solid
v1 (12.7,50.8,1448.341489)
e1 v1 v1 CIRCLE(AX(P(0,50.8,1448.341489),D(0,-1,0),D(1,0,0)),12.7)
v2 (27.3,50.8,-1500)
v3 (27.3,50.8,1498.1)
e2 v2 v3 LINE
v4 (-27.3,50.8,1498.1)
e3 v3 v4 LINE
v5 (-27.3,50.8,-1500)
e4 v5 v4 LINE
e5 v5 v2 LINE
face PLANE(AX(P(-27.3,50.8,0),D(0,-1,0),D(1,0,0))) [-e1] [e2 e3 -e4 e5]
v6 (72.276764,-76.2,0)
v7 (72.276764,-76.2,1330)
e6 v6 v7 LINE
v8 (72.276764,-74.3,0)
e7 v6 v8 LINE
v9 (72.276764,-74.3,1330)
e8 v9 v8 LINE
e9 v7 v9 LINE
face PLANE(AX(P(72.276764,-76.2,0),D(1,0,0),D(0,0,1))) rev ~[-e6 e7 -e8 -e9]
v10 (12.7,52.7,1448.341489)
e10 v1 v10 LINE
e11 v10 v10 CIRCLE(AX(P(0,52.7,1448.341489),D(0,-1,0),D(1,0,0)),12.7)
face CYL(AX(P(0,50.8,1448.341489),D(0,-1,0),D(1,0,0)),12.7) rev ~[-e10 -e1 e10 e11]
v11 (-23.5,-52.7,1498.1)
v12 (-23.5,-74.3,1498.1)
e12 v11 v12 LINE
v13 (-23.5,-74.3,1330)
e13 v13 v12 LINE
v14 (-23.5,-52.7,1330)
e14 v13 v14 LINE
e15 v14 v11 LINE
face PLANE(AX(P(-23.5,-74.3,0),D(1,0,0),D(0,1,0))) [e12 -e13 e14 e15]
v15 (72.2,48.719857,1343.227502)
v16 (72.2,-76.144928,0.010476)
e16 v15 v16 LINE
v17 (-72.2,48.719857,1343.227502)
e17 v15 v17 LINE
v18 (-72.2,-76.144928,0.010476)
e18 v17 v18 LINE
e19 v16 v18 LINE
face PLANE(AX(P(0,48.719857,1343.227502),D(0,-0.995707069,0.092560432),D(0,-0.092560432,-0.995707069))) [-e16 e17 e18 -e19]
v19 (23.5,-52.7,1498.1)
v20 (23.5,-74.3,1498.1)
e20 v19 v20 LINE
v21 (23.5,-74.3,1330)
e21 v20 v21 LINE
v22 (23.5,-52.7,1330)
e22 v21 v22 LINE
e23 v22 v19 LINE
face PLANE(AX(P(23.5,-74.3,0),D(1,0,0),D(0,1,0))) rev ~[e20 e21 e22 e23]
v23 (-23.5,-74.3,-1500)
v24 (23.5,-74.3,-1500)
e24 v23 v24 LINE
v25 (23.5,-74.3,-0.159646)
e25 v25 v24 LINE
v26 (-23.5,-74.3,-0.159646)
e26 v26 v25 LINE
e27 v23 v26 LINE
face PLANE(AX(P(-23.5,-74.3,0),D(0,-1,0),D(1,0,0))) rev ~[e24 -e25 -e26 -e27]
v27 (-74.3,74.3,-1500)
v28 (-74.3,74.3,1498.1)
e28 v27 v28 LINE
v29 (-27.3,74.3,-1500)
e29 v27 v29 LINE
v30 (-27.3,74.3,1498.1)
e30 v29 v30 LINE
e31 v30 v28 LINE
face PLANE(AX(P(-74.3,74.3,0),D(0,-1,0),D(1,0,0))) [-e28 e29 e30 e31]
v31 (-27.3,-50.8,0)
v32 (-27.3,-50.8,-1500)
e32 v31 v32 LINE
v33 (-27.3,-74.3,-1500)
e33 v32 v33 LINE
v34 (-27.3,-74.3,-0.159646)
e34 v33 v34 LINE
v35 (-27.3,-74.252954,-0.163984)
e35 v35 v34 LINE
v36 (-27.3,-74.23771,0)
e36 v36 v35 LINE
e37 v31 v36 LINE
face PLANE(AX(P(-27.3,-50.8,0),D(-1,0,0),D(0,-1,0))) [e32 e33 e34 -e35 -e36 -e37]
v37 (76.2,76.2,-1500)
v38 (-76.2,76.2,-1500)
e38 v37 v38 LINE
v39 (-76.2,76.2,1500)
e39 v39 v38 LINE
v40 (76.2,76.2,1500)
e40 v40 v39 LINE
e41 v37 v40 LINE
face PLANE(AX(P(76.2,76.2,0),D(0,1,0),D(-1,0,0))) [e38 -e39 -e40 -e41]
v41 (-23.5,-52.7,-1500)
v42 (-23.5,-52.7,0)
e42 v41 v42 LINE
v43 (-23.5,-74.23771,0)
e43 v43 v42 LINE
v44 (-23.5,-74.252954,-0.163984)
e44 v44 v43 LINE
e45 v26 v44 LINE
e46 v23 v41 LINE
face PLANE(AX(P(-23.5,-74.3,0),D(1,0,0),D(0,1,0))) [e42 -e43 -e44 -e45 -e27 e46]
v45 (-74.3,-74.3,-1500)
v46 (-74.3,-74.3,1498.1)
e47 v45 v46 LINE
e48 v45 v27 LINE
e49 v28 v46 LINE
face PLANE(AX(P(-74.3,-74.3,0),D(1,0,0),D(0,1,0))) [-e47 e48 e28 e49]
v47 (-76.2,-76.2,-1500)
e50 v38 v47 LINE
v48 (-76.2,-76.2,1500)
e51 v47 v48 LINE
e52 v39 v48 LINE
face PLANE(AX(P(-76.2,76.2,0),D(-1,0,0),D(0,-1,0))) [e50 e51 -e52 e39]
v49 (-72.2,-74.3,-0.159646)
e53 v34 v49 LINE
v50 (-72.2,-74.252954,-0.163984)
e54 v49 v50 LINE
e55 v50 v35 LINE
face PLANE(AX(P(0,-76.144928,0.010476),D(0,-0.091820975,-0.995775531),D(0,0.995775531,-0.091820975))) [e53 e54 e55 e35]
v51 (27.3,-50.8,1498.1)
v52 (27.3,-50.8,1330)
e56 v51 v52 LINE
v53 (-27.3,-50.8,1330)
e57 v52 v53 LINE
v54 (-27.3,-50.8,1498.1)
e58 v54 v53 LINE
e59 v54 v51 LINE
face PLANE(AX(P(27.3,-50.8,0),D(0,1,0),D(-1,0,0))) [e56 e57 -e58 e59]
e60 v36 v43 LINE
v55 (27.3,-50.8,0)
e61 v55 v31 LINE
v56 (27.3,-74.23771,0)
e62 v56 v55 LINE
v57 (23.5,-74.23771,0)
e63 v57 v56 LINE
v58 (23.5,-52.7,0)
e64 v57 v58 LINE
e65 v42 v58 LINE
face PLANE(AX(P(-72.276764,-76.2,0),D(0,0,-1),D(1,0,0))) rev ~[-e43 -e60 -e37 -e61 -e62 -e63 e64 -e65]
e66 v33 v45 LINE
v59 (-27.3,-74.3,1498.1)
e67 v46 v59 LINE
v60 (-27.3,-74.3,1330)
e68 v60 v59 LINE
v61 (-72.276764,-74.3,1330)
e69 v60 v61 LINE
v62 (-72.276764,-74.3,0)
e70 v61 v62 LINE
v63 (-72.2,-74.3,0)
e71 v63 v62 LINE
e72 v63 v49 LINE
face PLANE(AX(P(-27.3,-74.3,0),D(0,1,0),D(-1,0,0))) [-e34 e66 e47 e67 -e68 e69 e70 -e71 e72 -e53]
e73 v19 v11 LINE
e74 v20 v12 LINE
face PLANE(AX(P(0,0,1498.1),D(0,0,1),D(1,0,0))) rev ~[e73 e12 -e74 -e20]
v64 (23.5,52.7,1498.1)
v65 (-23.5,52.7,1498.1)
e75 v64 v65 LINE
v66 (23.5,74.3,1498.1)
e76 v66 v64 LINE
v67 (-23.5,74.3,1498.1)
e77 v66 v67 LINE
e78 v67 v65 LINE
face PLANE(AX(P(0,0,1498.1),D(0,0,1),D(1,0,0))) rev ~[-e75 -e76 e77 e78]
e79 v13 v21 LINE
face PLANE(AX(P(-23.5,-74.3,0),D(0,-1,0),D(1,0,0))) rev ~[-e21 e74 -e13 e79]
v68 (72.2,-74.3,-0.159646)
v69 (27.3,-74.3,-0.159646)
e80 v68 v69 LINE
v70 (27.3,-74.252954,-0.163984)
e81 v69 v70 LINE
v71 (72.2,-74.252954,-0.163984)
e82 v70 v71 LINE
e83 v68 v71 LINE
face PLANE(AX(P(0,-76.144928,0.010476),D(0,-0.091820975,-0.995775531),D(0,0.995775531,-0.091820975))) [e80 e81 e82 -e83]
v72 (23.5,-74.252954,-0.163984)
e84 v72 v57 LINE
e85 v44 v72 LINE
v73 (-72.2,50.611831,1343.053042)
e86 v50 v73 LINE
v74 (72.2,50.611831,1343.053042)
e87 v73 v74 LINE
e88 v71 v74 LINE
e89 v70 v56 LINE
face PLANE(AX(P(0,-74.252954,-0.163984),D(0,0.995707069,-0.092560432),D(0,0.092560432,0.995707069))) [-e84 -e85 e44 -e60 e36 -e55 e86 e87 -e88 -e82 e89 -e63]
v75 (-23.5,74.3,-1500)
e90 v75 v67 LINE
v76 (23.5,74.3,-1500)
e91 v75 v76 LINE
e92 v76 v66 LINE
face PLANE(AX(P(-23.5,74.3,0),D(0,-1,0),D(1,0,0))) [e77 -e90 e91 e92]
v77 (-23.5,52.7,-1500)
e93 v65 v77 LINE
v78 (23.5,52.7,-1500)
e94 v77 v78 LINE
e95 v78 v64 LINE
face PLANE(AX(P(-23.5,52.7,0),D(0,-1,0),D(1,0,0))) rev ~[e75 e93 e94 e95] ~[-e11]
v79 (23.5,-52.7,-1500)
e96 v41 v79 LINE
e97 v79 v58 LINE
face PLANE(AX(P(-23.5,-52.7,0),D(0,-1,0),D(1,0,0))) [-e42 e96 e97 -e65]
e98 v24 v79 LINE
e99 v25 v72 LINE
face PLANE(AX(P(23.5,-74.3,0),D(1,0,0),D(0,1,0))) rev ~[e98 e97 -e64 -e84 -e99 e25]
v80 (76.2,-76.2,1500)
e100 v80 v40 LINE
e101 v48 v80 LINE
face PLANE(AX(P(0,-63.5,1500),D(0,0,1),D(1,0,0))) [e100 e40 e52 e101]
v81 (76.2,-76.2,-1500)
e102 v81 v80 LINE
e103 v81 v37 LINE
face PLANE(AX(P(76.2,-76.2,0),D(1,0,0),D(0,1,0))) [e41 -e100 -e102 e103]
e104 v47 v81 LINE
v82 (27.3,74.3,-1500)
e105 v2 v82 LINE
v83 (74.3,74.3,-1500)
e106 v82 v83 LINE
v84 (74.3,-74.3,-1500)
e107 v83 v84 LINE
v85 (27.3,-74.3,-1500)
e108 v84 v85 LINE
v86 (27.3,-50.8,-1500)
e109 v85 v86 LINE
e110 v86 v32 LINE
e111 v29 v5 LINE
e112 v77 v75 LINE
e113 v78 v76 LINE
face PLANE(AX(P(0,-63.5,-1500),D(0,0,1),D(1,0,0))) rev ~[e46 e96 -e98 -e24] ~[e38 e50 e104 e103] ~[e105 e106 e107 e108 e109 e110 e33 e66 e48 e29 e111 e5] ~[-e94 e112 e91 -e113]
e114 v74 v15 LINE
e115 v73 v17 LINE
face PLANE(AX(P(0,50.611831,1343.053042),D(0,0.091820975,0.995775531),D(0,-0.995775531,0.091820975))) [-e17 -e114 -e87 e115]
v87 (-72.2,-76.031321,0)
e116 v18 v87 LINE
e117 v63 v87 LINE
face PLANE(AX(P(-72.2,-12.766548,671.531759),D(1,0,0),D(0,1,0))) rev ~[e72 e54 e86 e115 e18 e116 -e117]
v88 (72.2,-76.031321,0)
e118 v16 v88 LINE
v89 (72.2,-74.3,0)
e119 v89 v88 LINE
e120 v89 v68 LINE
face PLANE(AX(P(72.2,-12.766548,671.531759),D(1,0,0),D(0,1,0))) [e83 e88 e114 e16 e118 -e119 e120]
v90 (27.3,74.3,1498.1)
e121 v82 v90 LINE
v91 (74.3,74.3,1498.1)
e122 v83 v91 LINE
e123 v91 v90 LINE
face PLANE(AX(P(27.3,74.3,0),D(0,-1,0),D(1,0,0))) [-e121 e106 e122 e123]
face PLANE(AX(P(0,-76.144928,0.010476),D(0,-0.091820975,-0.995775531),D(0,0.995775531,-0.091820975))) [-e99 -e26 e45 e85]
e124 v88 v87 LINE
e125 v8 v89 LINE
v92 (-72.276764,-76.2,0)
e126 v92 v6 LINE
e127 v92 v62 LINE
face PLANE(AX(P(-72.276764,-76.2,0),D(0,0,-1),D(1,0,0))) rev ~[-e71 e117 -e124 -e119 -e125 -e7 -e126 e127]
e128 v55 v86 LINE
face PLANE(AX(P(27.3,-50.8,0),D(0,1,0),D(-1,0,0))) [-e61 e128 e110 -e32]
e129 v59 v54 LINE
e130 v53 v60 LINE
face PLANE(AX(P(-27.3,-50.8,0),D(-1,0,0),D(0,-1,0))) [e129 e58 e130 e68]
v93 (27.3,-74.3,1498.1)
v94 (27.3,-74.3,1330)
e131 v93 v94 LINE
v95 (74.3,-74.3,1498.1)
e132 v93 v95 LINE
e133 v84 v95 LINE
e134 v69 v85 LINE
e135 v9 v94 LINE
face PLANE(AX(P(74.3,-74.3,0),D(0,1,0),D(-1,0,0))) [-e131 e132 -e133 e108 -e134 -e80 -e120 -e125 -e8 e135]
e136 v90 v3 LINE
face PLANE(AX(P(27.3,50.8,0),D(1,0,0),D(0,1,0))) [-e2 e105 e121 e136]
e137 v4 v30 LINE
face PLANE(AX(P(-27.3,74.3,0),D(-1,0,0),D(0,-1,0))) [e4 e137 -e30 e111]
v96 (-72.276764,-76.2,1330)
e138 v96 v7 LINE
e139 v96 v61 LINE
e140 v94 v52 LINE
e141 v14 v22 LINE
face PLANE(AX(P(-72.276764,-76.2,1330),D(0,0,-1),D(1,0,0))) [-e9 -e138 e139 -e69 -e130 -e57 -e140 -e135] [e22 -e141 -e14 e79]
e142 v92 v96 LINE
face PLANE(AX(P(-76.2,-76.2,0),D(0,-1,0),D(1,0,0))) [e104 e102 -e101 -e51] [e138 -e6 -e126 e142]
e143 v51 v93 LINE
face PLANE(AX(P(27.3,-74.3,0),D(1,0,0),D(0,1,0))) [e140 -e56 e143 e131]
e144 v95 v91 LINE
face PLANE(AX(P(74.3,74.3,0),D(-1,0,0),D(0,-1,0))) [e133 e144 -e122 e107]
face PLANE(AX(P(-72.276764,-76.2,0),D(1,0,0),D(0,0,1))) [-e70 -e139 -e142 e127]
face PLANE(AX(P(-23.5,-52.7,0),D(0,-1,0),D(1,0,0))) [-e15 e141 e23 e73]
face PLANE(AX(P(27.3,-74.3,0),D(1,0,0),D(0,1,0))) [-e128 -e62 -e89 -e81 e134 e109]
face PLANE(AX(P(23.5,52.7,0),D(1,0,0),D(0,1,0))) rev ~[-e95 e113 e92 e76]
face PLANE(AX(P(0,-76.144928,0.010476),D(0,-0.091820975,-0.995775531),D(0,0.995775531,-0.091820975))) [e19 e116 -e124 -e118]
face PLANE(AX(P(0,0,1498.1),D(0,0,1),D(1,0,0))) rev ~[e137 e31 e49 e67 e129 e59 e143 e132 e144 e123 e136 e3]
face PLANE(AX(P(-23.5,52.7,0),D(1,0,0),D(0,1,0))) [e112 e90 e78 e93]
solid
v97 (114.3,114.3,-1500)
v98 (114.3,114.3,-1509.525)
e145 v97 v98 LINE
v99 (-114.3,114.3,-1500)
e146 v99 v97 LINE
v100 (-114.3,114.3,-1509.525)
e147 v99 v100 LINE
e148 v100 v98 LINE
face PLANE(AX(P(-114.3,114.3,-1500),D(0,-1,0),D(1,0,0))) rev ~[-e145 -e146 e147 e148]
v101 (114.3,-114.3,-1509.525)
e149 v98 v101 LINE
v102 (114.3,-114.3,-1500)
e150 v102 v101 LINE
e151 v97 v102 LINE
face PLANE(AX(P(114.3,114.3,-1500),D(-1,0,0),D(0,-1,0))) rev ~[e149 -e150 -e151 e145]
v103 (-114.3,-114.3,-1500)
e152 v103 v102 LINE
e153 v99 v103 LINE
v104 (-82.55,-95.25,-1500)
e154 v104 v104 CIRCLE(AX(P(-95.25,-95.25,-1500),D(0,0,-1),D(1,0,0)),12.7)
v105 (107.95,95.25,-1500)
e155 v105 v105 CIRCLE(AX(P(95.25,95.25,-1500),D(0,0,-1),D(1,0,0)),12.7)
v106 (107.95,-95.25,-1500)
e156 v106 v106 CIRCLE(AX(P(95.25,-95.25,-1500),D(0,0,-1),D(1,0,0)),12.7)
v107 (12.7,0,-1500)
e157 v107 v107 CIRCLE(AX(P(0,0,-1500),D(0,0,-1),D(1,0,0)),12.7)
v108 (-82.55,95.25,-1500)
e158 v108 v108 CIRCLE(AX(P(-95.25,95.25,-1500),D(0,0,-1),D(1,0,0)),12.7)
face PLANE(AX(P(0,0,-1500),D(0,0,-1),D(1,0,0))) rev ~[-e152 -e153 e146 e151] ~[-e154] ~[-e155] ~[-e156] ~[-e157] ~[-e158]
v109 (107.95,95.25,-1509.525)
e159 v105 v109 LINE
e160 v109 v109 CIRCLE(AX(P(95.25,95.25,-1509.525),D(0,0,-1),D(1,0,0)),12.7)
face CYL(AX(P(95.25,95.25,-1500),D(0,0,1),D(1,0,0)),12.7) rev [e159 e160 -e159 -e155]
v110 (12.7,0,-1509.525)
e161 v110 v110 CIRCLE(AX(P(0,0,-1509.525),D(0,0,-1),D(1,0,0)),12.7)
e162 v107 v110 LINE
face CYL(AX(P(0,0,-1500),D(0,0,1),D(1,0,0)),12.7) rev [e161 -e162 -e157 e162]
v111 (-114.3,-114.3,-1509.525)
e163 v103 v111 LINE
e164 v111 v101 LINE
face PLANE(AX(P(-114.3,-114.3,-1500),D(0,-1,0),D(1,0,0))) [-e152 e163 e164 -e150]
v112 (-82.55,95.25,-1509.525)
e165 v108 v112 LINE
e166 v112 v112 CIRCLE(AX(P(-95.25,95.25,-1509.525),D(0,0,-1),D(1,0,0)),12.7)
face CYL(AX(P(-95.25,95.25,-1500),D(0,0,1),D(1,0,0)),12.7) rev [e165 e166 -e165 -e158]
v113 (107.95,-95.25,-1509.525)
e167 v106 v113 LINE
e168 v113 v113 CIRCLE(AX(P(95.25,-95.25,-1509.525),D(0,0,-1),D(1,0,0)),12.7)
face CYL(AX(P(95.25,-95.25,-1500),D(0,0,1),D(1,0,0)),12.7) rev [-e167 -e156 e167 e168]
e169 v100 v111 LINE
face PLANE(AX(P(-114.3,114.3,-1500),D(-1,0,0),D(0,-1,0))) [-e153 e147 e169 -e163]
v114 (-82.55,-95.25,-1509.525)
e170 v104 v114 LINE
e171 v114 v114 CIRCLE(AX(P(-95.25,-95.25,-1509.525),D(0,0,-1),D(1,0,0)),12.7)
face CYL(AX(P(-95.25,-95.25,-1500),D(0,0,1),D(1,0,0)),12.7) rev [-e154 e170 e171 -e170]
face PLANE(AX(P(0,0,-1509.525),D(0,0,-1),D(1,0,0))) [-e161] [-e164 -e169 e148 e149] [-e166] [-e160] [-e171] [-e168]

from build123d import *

# Parameters (mm, degrees)
F0_W      = 50.8
F0_H      = 25.4
F0_W_2    = 47
F0_H_2    = 21.6
F1_DEPTH  = 1500
F2_W      = 228.6
F2_H      = 228.6
F2_R      = 12.7
F3_DEPTH  = 9.525
F4_W      = 144.553527236
F4_H      = 1330
F5_DEPTH  = 81
F6_W      = 152.4
F6_H      = 152.4
F7_DEPTH  = 1.9
F9_DEPTH  = 72.2
F10_R     = 12.7
F11_DEPTH = 1.9


# Not quite as in the source:
# - a length typed as a fraction of an inch, garbled in the dataset ("3 / 203.2 mm" for 3/8 in), is restored


with BuildPart() as f1:
    # F0 (on Top) → F1 (new body, symmetric)
    with BuildSketch(Plane.XY):
        with Locations((0, -63.5)):
            Rectangle(F0_W, F0_H)
        with Locations((0, -63.5)):
            Rectangle(F0_W_2, F0_H_2, mode=Mode.SUBTRACT)
        with Locations((0, 63.5)):
            Rectangle(F0_W, F0_H)
        with Locations((0, 63.5)):
            Rectangle(F0_W_2, F0_H_2, mode=Mode.SUBTRACT)
        Polygon((-25.4, 76.2), (-76.2, 76.2), (-76.2, -76.2), (-25.4, -76.2), (-25.4, -50.8), (-27.3, -50.8), (-27.3, -74.3), (-74.3, -74.3), (-74.3, 74.3), (-27.3, 74.3), (-27.3, 50.8), (-25.4, 50.8), align=None)
        Polygon((76.2, 76.2), (25.4, 76.2), (25.4, 50.8), (27.3, 50.8), (27.3, 74.3), (74.3, 74.3), (74.3, -74.3), (27.3, -74.3), (27.3, -50.8), (25.4, -50.8), (25.4, -76.2), (76.2, -76.2), align=None)
    extrude(amount=F1_DEPTH, both=True)

    # F4 (on face) → F5 (cut)
    with BuildSketch(Plane.XZ.offset(76.2)):
        with Locations((0, 665)):
            Rectangle(F4_W, F4_H)
    extrude(amount=-F5_DEPTH, mode=Mode.SUBTRACT)

    # F6 (on face) → F7 (join)
    with BuildSketch(Plane.XY.offset(1500)):
        Rectangle(F6_W, F6_H)
    extrude(amount=-F7_DEPTH)

    # F8 (on Right) → F9 (join, symmetric)
    with BuildSketch(Plane.YZ):
        Polygon((-76.1449276874, 0.0104757039), (-74.2529536564, -0.1639841968), (50.611830749, 1343.0530421202), (48.719856718, 1343.2275020208), align=None)
    extrude(amount=F9_DEPTH, both=True)

    # F10 (on face) → F11 (cut, through all)
    with BuildSketch(Plane.XZ.offset(-50.8)):
        with Locations((0, 1448.3414888382)):
            Circle(F10_R)
    extrude(amount=-F11_DEPTH, mode=Mode.SUBTRACT)


with BuildPart() as f3:
    # F2 (on face) → F3 (new body)
    with BuildSketch(Plane(origin=(0, 0, -1500), x_dir=(1, 0, 0), z_dir=(0, 0, -1))):
        Rectangle(F2_W, F2_H)
        with Locations((-95.25, -95.25)):
            Circle(F2_R, mode=Mode.SUBTRACT)
        with Locations((95.25, -95.25)):
            Circle(F2_R, mode=Mode.SUBTRACT)
        with Locations((-95.25, 95.25)):
            Circle(F2_R, mode=Mode.SUBTRACT)
        Circle(F2_R, mode=Mode.SUBTRACT)
        with Locations((95.25, 95.25)):
            Circle(F2_R, mode=Mode.SUBTRACT)
    extrude(amount=F3_DEPTH)


solid = Compound([f1.part, f3.part])
